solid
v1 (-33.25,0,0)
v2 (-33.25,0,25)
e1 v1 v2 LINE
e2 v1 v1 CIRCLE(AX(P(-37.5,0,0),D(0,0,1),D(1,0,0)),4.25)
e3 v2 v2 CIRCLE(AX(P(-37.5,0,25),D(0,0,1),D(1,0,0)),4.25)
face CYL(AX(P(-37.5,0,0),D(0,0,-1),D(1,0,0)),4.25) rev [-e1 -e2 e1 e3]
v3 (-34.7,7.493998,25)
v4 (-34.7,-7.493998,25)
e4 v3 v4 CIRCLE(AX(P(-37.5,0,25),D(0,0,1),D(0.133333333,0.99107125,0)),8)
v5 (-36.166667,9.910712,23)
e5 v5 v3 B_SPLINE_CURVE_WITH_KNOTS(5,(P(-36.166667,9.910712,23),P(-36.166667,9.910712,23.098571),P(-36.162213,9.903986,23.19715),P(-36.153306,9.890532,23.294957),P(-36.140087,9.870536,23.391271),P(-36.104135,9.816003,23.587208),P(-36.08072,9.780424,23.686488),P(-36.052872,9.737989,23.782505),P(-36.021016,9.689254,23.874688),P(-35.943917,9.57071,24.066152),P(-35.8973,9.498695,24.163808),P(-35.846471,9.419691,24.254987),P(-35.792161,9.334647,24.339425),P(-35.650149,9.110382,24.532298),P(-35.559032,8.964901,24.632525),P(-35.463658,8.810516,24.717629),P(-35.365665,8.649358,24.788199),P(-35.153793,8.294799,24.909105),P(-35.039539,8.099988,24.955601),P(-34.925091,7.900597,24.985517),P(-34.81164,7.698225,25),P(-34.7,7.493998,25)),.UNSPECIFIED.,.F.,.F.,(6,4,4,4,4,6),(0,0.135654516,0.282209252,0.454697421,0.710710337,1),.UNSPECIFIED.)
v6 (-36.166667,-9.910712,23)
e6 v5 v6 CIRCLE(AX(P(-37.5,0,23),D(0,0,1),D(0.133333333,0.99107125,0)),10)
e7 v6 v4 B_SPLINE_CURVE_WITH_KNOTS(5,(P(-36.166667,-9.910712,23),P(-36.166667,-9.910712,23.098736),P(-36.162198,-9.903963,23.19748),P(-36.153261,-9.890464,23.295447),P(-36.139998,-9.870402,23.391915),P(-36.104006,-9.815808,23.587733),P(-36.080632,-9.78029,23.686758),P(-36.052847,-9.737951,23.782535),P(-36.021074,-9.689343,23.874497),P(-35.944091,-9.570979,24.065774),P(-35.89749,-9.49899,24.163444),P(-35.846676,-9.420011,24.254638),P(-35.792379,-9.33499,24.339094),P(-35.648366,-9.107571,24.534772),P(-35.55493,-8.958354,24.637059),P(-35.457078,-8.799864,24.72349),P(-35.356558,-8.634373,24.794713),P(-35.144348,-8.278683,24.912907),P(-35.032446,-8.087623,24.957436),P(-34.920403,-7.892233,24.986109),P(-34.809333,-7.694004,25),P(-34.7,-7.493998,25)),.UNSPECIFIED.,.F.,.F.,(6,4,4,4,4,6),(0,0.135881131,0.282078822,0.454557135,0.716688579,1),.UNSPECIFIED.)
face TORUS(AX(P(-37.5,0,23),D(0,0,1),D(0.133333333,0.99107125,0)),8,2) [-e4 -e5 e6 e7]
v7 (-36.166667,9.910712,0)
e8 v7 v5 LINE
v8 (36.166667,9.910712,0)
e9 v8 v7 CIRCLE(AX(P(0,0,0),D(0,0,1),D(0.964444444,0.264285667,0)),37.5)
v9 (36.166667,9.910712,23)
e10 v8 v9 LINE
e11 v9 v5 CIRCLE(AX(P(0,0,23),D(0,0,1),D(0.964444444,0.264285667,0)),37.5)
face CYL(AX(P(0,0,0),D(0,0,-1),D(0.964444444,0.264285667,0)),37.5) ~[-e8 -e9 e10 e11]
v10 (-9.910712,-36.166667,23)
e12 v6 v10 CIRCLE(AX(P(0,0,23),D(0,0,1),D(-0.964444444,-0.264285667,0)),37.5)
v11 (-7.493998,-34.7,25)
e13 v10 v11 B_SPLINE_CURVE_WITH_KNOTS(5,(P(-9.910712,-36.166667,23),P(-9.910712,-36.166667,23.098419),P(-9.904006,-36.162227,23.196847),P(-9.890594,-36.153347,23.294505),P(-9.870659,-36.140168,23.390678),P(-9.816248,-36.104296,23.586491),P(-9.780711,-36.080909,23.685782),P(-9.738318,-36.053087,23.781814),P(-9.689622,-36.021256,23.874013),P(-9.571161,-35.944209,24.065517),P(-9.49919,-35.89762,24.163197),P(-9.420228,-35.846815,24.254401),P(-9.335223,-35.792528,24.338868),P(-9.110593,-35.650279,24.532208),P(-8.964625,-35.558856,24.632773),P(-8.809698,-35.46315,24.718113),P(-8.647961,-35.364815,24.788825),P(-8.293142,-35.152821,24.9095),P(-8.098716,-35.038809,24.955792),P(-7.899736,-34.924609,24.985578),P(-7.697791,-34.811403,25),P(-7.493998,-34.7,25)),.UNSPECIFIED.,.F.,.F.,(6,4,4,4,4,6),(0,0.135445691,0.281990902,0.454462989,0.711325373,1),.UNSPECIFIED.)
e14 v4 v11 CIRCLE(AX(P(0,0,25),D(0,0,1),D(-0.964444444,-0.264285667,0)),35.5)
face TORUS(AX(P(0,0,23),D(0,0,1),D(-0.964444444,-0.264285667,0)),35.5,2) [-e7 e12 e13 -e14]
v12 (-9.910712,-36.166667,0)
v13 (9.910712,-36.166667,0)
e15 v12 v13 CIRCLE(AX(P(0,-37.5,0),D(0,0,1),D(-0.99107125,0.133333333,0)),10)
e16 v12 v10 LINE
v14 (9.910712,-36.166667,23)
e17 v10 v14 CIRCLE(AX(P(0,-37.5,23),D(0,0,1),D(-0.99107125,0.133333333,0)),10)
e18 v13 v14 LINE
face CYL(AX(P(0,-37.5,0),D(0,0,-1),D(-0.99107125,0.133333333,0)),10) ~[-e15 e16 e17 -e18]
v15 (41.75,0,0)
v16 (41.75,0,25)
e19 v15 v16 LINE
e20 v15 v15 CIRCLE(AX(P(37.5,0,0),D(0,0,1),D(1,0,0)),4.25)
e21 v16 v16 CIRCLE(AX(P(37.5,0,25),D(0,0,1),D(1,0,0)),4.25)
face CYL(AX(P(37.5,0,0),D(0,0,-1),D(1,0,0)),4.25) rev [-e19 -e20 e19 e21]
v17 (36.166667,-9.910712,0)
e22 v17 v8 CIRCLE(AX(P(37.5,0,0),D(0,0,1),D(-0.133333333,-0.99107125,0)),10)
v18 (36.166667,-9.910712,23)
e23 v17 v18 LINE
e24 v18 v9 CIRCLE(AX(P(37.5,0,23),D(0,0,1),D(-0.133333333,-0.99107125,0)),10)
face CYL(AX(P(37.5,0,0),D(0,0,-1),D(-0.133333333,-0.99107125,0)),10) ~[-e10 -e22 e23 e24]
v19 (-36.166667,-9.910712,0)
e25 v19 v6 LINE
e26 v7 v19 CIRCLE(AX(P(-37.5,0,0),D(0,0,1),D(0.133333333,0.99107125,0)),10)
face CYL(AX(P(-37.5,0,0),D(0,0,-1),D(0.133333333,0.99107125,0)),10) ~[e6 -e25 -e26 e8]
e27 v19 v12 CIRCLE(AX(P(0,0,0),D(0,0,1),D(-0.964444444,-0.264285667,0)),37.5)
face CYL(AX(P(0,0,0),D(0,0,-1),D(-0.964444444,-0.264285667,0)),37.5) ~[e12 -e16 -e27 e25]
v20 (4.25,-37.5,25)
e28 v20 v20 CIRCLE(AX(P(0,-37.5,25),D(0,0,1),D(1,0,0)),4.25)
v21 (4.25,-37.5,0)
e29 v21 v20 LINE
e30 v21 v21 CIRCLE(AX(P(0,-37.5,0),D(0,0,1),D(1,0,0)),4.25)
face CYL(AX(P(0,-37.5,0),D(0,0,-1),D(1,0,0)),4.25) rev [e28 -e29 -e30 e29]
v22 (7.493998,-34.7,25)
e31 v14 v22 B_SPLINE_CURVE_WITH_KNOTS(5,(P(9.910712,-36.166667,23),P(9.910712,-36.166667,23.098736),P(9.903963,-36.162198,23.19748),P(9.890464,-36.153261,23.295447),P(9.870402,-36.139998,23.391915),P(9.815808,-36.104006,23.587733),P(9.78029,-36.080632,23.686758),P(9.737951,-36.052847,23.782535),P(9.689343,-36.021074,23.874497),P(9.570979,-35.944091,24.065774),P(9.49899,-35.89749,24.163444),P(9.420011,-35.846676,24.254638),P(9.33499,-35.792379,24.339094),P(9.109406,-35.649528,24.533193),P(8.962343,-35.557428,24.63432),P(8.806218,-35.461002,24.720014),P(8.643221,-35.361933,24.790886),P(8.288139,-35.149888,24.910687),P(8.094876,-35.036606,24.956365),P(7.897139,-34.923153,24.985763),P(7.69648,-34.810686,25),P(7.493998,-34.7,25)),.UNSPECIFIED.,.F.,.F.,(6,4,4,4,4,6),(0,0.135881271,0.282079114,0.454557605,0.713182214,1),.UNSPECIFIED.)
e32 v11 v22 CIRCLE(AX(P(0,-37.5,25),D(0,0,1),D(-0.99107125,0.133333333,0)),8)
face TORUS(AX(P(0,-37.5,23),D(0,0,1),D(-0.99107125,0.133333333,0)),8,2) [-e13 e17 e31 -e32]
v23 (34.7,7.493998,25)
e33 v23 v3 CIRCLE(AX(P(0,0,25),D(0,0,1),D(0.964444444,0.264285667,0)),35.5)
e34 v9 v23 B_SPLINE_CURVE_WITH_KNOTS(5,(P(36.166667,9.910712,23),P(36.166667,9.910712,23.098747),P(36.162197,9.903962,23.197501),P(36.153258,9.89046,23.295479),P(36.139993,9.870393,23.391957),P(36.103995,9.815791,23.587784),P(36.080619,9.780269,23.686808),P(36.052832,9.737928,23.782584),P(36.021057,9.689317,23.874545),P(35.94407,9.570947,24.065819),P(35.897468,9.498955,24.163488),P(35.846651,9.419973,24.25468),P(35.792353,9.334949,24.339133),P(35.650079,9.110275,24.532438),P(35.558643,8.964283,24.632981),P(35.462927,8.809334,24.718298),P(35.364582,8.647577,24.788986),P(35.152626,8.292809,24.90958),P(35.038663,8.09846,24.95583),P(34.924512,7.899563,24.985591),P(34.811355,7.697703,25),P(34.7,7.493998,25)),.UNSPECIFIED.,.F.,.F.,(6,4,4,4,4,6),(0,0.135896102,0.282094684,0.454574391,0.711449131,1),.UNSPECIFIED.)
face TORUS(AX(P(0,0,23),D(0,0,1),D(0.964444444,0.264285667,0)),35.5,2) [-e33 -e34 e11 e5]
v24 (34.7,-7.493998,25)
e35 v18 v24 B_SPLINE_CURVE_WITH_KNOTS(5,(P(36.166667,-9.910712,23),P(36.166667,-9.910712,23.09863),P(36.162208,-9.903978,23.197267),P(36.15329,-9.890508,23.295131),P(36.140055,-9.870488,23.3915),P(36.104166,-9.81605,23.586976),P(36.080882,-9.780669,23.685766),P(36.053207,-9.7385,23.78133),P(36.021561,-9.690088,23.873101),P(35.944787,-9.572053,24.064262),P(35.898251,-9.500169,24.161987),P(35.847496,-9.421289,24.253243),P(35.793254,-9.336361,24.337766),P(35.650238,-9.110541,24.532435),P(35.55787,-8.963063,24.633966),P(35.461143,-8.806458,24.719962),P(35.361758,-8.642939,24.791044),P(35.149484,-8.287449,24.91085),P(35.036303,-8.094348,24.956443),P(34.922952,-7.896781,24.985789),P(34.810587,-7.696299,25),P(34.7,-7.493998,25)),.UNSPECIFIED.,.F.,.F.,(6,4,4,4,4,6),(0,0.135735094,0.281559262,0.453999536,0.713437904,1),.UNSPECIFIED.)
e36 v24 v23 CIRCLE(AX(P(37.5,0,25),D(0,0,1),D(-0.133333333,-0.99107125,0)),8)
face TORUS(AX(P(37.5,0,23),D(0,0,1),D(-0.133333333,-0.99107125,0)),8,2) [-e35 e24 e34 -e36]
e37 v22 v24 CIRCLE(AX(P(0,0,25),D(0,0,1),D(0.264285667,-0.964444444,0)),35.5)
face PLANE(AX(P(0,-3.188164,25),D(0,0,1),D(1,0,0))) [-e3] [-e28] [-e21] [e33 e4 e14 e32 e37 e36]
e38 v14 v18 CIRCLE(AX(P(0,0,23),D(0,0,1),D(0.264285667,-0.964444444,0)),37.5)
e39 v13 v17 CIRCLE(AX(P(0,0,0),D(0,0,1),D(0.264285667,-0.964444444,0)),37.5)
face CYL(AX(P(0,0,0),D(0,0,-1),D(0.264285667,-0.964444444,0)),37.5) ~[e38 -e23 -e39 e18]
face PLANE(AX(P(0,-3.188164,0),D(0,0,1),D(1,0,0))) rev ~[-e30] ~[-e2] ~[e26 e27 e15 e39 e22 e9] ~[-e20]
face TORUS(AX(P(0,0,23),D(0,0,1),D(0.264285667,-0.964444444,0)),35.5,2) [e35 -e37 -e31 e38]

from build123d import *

# Parameters (mm, degrees)
F0_R     = 4.25
F1_DEPTH = 25
F3_R     = 2


# Not quite as in the source:
# - a feature of the source that left no trace in its solid (it failed there, or was rolled back) is left out


with BuildPart() as f1:
    # F0 (on Top) → F1 (new body)
    with BuildSketch(Plane.XY):
        with BuildLine():
            ThreePointArc((36.1666666667, -9.9107124982), (47.5, 0), (36.1666666667, 9.9107124982))
            ThreePointArc((36.1666666667, 9.9107124982), (0, 37.5), (-36.1666666667, 9.9107124982))
            ThreePointArc((-36.1666666667, 9.9107124982), (-47.5, 0), (-36.1666666667, -9.9107124982))
            ThreePointArc((-36.1666666667, -9.9107124982), (-26.5165042945, -26.5165042945), (-9.9107124982, -36.1666666667))
            ThreePointArc((-9.9107124982, -36.1666666667), (0, -47.5), (9.9107124982, -36.1666666667))
            ThreePointArc((9.9107124982, -36.1666666667), (26.5165042945, -26.5165042945), (36.1666666667, -9.9107124982))
        make_face()
        with Locations((0, -37.5)):
            Circle(F0_R, mode=Mode.SUBTRACT)
        with Locations((-37.5, 0)):
            Circle(F0_R, mode=Mode.SUBTRACT)
        with Locations((37.5, 0)):
            Circle(F0_R, mode=Mode.SUBTRACT)
    extrude(amount=F1_DEPTH)

    # F3
    f3_edges = [f1.edges().sort_by_distance(p)[0] for p in [
        (0, -47.5, 25),
        (26.516504, -26.516504, 25),
        (47.5, 0, 25),
        (0, 37.5, 25),
        (-47.5, 0, 25),
        (-26.516504, -26.516504, 25),
    ]]
    fillet(f3_edges, radius=F3_R)


solid = f1.part
